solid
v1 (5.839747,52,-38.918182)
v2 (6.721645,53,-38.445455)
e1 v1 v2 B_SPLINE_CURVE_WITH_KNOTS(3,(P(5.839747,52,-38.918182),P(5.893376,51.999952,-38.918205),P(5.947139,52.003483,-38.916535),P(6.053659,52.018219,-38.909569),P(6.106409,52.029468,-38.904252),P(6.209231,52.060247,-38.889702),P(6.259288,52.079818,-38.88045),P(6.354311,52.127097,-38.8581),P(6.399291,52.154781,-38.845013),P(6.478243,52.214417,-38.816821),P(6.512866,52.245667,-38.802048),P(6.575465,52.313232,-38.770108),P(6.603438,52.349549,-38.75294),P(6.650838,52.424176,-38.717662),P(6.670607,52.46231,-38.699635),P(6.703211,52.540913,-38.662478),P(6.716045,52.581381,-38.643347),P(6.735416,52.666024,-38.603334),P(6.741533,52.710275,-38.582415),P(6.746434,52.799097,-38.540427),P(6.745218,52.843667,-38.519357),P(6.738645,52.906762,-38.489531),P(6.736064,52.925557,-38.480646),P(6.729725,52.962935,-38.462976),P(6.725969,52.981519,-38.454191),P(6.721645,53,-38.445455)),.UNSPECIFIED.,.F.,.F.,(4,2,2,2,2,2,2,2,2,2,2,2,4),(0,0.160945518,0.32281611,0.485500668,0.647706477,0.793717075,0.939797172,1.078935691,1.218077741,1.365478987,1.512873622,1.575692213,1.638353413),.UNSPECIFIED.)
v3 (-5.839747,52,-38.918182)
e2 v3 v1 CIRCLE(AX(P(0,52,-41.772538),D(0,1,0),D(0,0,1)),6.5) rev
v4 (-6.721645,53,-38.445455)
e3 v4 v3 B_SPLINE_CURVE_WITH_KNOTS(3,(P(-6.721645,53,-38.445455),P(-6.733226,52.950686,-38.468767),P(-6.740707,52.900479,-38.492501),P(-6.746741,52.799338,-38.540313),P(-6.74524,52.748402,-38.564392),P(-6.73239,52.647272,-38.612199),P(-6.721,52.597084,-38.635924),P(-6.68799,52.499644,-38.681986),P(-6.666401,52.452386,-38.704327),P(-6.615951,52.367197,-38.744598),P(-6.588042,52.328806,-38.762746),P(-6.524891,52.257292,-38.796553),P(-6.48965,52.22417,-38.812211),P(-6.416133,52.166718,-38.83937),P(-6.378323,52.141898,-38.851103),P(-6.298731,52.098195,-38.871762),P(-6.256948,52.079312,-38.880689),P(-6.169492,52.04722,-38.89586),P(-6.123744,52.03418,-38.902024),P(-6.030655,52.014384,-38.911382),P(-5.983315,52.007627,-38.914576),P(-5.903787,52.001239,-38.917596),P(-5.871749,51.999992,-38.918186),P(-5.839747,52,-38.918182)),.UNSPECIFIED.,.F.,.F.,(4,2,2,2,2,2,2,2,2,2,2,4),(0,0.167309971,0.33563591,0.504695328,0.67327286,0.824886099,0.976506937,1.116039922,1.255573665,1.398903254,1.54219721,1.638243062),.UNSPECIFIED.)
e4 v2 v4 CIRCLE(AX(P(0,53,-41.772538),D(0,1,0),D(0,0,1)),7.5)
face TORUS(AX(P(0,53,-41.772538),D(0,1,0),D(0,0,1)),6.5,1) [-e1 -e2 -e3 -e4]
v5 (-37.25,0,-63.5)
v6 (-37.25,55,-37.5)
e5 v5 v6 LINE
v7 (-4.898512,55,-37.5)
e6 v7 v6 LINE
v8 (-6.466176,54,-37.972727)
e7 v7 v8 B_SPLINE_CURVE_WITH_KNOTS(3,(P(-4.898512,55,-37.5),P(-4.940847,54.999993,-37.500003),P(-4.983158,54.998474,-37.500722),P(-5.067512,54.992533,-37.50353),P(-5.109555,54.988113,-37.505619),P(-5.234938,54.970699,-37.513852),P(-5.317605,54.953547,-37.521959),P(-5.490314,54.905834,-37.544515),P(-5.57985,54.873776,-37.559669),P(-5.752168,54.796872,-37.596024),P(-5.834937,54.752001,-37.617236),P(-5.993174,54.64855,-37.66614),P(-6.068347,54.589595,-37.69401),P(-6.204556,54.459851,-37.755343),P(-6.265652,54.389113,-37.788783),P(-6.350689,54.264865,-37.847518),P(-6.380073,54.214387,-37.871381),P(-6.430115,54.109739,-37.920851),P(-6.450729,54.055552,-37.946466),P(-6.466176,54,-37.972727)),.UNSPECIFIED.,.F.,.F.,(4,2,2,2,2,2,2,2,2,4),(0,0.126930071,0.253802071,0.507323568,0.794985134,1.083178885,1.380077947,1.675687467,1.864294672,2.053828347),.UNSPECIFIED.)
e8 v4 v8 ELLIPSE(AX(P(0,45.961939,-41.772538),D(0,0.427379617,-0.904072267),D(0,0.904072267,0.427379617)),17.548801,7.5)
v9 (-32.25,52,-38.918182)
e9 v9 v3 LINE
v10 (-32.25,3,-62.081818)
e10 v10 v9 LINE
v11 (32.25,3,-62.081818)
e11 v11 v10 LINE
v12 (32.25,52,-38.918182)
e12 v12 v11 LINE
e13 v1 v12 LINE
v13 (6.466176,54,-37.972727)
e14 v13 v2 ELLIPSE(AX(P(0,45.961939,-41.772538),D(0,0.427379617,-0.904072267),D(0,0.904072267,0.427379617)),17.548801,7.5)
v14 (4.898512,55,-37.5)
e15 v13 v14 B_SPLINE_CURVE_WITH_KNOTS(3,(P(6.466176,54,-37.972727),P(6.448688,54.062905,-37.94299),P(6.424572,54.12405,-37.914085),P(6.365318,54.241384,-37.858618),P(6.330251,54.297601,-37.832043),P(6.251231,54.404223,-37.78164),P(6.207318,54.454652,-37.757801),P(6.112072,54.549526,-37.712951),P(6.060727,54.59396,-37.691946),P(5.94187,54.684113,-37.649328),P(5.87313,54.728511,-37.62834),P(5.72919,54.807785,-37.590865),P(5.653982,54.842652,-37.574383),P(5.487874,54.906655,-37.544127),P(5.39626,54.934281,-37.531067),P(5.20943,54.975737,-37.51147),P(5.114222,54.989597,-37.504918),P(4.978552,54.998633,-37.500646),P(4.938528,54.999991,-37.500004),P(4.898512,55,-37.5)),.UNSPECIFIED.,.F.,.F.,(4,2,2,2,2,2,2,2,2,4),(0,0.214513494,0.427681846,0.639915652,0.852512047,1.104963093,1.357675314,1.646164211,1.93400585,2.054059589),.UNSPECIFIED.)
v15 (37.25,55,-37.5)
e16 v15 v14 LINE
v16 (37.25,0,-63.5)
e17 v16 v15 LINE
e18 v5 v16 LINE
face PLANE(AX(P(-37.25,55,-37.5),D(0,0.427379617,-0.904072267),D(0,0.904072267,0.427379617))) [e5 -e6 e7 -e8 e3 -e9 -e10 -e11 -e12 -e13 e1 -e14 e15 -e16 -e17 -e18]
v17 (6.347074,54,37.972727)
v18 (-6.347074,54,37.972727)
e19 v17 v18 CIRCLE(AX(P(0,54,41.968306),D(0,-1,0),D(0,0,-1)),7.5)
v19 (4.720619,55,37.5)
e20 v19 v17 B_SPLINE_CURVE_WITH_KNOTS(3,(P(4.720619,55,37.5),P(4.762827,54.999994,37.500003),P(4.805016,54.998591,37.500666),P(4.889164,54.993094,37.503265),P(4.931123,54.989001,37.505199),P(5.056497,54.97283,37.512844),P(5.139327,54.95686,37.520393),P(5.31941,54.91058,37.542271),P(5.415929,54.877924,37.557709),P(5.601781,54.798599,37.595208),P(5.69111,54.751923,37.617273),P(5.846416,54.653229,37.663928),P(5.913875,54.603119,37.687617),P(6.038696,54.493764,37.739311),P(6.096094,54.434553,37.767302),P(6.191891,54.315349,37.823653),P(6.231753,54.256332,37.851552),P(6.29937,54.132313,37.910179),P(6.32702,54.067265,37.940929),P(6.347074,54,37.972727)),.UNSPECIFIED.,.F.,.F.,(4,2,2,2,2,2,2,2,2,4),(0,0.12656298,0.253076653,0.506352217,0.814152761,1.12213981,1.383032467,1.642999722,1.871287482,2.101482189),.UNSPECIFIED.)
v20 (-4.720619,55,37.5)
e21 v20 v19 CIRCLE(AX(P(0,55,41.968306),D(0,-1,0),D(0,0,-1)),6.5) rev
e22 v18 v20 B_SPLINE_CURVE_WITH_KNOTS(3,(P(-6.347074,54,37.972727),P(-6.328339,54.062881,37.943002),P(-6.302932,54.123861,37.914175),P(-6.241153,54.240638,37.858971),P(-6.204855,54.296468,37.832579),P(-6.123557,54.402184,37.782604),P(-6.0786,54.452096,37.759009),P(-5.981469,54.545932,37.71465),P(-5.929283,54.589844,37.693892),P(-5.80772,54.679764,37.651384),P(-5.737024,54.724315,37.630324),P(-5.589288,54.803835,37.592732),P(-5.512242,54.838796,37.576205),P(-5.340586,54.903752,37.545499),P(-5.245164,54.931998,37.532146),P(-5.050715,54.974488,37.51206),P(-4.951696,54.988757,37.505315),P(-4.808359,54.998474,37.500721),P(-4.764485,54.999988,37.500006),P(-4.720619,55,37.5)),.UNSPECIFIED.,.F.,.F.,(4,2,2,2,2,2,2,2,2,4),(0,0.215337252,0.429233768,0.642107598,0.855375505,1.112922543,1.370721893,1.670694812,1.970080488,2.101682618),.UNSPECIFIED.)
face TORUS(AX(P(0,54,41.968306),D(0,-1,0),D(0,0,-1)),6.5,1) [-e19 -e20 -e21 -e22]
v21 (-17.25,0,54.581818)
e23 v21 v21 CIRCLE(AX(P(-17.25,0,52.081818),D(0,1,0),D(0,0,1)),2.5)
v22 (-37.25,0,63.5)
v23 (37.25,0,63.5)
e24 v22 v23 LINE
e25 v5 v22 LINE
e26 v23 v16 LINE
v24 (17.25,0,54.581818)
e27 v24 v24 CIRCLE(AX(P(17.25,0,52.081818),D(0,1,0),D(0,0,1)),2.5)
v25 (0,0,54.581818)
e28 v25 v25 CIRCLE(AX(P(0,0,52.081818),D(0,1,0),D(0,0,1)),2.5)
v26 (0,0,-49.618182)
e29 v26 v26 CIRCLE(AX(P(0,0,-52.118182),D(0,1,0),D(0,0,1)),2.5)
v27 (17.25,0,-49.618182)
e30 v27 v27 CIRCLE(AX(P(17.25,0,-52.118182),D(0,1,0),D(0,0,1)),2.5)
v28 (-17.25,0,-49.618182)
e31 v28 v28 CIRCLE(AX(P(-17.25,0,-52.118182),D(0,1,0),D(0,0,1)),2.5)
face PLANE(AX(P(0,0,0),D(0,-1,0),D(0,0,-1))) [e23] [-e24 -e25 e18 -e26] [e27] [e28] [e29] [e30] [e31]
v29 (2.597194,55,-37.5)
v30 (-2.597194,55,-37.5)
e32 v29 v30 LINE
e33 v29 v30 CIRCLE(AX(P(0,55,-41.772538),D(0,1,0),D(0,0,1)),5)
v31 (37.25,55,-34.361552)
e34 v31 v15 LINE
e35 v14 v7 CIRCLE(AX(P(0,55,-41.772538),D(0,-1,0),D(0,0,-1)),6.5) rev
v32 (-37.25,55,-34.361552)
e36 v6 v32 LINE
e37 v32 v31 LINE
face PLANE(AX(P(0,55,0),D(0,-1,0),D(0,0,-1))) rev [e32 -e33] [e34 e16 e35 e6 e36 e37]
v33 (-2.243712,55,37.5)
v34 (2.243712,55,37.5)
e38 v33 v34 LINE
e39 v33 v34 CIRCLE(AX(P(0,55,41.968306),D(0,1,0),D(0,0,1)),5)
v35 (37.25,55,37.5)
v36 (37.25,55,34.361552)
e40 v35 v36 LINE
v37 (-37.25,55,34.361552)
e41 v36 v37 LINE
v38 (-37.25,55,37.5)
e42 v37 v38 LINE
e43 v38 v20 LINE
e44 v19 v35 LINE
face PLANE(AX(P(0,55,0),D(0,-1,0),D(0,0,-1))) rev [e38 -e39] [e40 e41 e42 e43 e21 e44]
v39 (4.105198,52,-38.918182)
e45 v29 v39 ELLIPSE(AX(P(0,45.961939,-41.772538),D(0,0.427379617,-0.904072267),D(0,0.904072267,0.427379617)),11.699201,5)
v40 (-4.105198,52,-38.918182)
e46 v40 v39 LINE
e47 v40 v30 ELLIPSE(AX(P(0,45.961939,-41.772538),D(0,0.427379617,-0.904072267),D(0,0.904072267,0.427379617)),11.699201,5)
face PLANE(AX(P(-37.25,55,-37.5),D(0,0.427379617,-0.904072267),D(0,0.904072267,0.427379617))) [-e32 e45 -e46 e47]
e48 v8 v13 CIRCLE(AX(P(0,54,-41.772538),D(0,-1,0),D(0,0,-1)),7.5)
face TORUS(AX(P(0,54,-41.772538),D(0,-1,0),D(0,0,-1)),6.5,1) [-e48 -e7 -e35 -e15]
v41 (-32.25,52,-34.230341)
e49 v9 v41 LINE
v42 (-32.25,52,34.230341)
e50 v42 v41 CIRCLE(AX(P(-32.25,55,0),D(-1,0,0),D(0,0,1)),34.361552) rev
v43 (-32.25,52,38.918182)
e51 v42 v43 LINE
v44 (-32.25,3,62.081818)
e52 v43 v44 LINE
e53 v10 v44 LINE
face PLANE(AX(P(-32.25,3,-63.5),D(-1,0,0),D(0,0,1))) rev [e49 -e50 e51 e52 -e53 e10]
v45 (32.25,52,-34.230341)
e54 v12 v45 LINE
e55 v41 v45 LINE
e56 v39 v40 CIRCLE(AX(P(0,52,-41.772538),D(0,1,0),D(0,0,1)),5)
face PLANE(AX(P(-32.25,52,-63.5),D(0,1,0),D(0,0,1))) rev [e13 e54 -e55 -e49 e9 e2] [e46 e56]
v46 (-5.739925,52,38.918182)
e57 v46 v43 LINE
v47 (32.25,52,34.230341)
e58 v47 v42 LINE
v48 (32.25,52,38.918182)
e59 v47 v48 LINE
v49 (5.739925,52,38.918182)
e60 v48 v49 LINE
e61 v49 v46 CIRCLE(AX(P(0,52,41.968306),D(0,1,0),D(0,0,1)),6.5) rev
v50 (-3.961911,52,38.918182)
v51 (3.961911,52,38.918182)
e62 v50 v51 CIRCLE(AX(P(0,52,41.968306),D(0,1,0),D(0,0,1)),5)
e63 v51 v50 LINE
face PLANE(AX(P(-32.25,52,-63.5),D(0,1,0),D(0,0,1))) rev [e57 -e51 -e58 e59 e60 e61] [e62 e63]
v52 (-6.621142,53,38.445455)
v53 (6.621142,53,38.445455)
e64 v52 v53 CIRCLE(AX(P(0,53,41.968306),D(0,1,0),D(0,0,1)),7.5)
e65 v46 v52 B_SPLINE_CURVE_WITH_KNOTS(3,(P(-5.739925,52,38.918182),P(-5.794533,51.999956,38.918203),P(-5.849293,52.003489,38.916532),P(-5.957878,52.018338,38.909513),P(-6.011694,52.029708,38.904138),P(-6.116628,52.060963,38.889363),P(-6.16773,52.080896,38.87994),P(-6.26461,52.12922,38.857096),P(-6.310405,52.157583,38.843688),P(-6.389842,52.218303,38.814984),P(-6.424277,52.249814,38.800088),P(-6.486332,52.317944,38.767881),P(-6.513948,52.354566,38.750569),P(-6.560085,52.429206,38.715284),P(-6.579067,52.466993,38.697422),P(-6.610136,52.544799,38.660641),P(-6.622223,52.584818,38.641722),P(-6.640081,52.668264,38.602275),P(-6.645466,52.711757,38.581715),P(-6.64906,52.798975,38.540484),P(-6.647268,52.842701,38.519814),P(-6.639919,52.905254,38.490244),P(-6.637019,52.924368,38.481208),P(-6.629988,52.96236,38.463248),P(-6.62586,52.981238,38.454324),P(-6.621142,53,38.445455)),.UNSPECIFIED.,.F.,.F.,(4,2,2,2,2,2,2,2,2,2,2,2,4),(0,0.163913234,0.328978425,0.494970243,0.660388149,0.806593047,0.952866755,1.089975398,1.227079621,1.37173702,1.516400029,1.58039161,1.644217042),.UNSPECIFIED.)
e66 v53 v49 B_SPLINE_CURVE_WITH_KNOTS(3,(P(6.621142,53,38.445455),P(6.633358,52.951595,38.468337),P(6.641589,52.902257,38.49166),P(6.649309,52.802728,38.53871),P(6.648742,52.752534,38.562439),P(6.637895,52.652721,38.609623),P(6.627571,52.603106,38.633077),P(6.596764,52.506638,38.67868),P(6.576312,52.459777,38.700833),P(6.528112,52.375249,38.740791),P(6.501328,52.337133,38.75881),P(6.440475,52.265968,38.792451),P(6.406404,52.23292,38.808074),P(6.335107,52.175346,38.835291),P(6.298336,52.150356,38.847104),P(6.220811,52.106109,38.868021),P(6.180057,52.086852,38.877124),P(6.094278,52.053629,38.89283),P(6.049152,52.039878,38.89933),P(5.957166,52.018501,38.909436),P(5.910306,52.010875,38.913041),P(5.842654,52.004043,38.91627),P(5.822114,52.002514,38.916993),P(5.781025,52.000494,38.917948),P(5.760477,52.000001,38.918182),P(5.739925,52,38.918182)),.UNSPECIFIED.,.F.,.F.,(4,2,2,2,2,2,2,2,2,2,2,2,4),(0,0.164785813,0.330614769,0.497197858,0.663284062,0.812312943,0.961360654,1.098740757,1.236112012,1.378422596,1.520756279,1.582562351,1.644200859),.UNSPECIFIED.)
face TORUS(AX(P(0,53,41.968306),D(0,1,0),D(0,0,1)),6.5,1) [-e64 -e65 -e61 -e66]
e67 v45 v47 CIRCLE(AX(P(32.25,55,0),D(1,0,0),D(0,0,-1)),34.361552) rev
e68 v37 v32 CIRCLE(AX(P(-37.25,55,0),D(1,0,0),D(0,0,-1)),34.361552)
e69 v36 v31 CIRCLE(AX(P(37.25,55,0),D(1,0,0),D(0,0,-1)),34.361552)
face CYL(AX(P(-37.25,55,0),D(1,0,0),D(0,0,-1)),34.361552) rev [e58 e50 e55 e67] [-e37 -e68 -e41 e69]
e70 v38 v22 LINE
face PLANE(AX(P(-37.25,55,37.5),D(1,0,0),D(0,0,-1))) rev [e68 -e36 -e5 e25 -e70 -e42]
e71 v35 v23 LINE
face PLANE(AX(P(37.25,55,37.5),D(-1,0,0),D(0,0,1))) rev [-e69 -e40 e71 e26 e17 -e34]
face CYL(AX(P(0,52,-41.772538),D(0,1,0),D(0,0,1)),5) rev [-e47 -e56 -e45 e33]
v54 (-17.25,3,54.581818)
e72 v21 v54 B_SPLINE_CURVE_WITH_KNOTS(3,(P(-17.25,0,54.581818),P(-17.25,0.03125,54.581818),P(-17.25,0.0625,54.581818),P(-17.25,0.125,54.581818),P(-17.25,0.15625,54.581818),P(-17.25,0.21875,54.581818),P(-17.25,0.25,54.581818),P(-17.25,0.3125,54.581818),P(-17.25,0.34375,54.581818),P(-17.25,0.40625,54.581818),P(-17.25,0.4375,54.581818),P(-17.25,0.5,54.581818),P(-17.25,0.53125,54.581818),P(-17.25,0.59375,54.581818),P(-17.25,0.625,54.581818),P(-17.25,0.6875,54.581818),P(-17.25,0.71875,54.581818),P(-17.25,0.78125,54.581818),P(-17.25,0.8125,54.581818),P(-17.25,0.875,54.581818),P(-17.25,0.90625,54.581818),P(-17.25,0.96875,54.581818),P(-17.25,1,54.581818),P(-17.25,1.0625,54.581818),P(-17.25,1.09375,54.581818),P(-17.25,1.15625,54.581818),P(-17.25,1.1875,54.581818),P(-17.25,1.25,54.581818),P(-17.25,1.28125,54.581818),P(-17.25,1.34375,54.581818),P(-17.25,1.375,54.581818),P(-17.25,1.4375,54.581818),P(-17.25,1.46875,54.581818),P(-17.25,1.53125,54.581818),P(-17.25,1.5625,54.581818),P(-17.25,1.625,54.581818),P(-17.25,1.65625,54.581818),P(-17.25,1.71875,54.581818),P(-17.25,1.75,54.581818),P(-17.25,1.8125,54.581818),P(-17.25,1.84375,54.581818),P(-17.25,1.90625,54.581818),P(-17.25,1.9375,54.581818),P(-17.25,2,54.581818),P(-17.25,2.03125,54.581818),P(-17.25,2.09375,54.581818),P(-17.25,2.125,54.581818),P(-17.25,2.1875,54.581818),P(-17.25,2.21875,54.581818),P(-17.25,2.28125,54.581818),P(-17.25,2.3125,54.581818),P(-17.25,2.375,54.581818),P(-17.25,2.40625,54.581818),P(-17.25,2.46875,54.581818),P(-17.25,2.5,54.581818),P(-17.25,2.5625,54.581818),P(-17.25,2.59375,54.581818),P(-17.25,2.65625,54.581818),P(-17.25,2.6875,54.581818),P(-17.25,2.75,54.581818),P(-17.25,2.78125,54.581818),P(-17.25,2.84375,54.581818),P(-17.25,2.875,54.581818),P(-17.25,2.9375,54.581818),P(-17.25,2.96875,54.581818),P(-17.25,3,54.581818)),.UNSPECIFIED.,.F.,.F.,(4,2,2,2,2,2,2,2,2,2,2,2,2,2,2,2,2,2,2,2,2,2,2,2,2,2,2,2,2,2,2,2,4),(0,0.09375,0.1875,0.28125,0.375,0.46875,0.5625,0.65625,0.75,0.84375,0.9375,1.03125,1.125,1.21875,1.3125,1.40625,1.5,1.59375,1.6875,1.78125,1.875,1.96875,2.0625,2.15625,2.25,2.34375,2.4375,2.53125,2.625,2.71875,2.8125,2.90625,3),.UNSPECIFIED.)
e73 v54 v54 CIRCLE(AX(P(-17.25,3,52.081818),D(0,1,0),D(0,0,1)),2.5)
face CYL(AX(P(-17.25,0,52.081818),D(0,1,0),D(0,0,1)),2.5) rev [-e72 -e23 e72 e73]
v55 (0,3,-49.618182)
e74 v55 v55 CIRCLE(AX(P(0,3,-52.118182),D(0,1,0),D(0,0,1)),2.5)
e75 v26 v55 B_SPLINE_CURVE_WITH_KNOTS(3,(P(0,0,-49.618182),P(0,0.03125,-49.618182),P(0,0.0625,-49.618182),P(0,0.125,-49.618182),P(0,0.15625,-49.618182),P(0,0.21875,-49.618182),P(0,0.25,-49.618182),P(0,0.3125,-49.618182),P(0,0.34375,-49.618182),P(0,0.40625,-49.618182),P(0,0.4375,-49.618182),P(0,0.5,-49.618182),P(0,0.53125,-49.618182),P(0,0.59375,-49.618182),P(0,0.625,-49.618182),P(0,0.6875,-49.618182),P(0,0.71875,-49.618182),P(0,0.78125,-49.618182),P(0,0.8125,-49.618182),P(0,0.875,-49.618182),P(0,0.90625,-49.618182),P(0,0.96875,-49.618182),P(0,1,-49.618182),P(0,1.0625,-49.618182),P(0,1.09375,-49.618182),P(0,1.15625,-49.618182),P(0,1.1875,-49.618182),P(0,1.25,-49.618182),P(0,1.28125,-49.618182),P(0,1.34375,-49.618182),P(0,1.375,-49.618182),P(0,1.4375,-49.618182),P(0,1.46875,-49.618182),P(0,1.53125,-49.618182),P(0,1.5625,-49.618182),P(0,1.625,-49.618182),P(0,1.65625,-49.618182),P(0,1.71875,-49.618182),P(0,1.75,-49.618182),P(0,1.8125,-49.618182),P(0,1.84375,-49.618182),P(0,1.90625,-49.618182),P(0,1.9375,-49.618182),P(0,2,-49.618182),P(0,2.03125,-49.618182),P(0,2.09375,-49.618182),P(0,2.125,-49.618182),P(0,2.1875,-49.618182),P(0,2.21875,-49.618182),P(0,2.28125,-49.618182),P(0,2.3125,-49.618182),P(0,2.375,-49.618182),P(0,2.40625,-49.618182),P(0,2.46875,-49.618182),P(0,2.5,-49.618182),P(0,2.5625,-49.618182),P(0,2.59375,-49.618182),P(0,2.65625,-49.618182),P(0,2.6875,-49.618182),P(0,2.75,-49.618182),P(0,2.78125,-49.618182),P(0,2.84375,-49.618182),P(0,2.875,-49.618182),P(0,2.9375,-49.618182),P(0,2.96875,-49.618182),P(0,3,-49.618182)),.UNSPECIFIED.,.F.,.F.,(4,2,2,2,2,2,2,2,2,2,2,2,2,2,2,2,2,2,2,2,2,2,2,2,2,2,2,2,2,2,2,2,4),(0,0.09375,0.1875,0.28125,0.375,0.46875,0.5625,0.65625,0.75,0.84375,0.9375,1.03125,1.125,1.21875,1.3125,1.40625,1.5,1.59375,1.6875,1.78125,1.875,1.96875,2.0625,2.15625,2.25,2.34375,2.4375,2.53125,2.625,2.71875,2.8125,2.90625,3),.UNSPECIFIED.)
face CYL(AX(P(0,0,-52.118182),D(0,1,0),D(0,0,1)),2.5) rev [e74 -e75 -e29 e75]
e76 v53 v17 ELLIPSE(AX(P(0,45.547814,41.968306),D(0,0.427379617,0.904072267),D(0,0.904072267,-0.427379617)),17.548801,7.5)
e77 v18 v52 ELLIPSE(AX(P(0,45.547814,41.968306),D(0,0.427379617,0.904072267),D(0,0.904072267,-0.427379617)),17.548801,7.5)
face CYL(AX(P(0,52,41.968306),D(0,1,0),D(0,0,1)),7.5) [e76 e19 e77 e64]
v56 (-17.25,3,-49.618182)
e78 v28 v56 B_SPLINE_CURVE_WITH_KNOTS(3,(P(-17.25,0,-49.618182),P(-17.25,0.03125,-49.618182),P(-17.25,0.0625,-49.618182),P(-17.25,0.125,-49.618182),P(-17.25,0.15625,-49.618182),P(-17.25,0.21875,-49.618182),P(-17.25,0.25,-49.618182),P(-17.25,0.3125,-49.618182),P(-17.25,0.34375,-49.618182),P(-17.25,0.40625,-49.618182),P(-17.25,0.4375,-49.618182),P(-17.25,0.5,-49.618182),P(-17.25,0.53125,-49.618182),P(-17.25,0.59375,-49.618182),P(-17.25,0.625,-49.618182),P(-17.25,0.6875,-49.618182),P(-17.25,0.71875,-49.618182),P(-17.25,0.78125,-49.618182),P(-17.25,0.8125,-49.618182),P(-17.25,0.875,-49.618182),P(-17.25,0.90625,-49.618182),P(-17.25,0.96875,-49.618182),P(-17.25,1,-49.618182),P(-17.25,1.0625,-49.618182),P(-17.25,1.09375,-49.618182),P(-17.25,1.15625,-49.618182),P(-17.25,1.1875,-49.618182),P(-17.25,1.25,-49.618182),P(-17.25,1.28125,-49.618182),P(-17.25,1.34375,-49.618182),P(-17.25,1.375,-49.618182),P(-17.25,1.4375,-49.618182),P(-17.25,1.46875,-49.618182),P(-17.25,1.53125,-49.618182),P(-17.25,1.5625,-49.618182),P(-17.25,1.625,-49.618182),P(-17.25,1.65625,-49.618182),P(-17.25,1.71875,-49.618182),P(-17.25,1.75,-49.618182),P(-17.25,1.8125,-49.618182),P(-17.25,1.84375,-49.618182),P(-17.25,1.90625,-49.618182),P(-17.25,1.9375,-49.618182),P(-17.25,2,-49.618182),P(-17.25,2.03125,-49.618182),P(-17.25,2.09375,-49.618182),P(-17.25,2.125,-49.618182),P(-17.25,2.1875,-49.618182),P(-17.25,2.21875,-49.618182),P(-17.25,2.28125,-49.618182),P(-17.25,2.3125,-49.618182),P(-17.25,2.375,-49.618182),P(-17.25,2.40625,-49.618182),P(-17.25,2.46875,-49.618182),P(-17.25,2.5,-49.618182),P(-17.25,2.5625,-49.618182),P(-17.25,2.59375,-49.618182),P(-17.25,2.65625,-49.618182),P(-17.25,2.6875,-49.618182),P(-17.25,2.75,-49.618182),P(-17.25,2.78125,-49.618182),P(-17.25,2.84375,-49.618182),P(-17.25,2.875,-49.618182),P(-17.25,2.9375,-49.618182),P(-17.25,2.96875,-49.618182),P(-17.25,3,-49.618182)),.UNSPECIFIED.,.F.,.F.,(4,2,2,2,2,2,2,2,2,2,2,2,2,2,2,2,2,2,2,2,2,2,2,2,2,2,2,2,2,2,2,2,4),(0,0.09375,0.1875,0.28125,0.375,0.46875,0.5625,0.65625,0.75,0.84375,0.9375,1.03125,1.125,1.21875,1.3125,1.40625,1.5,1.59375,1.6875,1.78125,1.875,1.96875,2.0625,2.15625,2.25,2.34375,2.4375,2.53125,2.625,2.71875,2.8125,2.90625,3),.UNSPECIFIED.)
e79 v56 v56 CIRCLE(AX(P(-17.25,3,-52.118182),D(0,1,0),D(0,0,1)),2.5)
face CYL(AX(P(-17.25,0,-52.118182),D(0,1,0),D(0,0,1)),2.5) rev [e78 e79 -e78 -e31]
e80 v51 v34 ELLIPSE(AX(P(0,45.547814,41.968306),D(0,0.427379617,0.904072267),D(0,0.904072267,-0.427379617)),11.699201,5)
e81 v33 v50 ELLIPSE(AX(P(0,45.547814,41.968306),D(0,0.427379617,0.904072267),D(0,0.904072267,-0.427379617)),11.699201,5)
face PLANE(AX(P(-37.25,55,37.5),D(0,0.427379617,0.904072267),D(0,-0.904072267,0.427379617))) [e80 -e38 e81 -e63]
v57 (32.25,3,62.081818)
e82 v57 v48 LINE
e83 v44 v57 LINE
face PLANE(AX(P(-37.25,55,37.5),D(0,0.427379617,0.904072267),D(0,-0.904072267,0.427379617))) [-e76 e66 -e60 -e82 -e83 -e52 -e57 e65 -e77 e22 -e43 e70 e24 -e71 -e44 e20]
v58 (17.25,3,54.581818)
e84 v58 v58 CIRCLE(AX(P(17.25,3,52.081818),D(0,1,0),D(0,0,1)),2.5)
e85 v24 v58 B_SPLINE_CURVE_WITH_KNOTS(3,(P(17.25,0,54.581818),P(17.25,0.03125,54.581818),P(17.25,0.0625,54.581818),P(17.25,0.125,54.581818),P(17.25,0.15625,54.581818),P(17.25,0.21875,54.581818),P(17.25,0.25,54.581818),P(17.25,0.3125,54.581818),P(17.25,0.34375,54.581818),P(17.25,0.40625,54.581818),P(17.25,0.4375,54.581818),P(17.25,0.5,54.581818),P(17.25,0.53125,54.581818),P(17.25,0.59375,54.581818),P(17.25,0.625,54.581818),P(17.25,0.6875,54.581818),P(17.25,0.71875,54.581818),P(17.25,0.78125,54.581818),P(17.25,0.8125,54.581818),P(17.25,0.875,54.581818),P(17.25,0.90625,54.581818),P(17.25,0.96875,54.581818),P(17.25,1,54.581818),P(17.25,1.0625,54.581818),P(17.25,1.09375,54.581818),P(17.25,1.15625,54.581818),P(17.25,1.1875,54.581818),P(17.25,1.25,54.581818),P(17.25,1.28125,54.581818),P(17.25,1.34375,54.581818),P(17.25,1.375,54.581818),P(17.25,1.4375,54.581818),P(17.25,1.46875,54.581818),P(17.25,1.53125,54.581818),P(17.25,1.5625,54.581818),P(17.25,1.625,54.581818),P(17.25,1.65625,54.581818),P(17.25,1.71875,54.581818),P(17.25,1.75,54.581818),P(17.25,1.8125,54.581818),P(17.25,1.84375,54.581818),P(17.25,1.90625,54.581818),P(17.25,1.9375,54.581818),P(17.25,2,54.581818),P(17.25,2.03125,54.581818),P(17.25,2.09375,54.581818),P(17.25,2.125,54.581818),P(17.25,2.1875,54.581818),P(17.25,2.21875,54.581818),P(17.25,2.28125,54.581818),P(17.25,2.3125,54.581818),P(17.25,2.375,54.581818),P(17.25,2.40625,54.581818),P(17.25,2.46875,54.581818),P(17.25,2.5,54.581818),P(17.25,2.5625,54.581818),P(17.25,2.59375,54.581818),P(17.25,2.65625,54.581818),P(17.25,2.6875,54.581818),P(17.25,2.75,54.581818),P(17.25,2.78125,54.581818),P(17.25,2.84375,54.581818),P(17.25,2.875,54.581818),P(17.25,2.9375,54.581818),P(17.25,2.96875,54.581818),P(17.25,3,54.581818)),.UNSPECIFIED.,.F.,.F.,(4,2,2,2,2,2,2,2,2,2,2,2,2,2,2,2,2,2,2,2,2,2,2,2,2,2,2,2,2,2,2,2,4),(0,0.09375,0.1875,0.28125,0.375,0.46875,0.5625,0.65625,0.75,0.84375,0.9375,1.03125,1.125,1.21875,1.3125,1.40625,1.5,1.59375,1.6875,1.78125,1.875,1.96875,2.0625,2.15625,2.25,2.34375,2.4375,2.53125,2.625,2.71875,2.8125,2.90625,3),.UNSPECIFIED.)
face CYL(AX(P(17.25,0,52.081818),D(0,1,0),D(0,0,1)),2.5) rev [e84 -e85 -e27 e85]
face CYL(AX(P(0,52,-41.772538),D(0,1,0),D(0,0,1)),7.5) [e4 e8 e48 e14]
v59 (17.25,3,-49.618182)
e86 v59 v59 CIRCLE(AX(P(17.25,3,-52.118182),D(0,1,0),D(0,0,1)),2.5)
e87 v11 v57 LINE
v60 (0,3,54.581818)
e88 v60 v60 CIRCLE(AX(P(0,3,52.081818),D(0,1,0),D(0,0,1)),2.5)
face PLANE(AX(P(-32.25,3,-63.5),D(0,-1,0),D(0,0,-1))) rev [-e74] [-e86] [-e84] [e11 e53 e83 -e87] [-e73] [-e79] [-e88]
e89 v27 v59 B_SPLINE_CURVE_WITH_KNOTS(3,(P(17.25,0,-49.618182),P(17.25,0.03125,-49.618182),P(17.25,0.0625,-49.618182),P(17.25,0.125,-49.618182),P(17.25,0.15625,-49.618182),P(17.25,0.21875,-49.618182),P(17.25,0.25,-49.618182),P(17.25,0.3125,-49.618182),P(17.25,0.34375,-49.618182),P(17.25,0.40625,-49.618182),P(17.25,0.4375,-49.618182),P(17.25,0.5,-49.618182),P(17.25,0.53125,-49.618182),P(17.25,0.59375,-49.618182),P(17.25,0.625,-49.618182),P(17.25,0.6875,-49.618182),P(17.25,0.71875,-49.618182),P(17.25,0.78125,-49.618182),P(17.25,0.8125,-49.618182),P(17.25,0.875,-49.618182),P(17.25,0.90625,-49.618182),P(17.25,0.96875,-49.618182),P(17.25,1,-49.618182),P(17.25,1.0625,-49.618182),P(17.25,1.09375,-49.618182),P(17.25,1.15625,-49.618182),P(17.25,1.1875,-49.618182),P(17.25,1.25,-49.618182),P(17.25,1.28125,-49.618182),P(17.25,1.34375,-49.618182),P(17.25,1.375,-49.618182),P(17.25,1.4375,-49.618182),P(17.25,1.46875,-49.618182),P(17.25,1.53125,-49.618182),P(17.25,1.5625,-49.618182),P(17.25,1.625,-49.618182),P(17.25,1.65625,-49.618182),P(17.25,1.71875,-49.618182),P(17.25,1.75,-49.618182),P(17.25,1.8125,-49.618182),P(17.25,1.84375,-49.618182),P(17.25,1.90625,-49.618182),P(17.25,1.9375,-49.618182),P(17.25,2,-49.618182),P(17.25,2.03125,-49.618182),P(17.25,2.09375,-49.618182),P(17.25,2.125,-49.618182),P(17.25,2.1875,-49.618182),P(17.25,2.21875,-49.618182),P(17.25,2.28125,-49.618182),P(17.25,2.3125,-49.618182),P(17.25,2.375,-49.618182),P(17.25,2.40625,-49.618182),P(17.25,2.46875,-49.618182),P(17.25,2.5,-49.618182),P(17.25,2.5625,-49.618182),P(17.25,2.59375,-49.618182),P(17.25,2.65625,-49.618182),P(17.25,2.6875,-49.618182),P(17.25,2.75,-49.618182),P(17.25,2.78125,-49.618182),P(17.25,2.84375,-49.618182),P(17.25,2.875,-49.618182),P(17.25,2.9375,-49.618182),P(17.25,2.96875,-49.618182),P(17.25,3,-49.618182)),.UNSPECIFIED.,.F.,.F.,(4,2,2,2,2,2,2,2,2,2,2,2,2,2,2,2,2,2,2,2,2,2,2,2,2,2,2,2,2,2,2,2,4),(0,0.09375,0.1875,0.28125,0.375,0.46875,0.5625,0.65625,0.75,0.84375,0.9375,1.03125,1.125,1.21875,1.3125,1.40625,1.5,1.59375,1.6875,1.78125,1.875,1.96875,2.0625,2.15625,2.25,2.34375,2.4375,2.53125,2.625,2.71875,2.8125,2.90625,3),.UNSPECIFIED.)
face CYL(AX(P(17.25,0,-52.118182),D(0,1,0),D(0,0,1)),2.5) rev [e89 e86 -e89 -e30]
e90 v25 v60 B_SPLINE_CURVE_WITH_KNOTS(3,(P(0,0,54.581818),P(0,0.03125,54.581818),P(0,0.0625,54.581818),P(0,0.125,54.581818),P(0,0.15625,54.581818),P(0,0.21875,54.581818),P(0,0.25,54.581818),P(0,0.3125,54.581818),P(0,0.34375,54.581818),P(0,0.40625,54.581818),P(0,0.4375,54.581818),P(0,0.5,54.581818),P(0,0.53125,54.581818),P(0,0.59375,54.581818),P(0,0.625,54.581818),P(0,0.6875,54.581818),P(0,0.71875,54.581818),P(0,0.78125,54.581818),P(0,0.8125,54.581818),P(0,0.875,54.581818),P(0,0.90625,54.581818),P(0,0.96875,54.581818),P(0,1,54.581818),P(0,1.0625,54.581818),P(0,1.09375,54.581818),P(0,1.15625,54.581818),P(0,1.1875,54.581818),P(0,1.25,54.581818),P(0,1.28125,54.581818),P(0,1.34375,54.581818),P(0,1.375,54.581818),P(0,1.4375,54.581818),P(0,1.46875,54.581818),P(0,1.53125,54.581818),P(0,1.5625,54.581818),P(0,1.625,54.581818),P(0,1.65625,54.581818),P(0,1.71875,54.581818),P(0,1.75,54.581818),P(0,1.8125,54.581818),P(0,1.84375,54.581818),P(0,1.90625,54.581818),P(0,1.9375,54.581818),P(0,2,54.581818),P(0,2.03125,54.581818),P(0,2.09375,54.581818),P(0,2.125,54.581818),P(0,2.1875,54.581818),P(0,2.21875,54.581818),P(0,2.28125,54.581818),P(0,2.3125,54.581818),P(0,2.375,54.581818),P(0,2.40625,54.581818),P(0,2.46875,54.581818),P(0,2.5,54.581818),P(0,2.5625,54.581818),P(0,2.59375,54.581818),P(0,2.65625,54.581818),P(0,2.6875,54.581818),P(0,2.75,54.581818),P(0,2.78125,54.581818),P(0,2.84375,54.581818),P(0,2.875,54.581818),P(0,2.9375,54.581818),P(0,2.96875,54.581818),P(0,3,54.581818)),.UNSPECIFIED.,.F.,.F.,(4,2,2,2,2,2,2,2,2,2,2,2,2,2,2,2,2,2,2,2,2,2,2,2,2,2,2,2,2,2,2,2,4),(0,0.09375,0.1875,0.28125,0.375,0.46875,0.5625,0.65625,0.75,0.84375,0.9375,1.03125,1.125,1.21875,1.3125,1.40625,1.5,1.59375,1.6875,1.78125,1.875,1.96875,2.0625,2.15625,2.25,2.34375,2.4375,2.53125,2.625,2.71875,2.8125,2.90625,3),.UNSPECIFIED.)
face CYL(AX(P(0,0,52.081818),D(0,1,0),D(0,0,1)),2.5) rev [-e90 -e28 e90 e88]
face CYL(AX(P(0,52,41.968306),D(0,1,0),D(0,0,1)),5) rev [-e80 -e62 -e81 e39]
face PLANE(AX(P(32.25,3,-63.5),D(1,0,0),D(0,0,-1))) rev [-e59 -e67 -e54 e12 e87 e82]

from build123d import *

# Parameters (mm, degrees)
SKETCH1_W               = 74.5
SKETCH1_H               = 75
BOSS_EXTRUDE1_DEPTH     = 55
SKETCH5_R               = 34.3615522135402
CUT_EXTRUDE2_DEPTH      = 100.90745717913153
BOSS_EXTRUDE3_DEPTH     = 74.5
BOSS_EXTRUDE4_DEPTH     = 74.5
CUT_EXTRUDE3_DEPTH      = 121.88656873284145
CUT_EXTRUDE3_DEPTH_BACK = 121.88656873284145
SKETCH9_W               = 64.5
SKETCH9_H               = 49.00000000000001
BOSS_EXTRUDE5_DEPTH     = 3
BOSS_EXTRUDE6_DEPTH     = 3
FILLET1_R               = 1
SKETCH12_R              = 2.499999999999999
SKETCH12_R_2            = 2.5000000000000027
SKETCH12_R_3            = 2.5000000000000018
CUT_EXTRUDE4_DEPTH      = 91.13219475054404
LPATTERN1_COUNT         = 2
LPATTERN1_PITCH         = 104.2


with BuildPart() as part:
    # Sketch1 → Boss-Extrude1 (new body)
    with BuildSketch(Plane(origin=(0, 0, 0), x_dir=(1, 0, 0), z_dir=(0, 1, 0))):
        Rectangle(SKETCH1_W, SKETCH1_H)
    extrude(amount=BOSS_EXTRUDE1_DEPTH)

    # Sketch5 → Cut-Extrude2 (cut, through all)
    with BuildSketch(Plane(origin=(37.25, 0, 0), x_dir=(0, 0, -1), z_dir=(1, 0, 0))):
        with Locations((6.94e-15, 55)):
            Circle(SKETCH5_R)
    extrude(amount=-CUT_EXTRUDE2_DEPTH, mode=Mode.SUBTRACT)

    # Sketch7 → Boss-Extrude3 (add)
    with BuildSketch(Plane(origin=(37.25, 0, 0), x_dir=(0, 0, -1), z_dir=(1, 0, 0))):
        Polygon((-37.49999999999999, 55), (-63.5, 0), (-37.49999999999999, 0), align=None)
    extrude(amount=-BOSS_EXTRUDE3_DEPTH)

    # Sketch8 → Boss-Extrude4 (add)
    with BuildSketch(Plane(origin=(37.25, 0, 0), x_dir=(0, 0, -1), z_dir=(1, 0, 0))):
        Polygon((37.50000000000001, 55), (63.5, -2.4e-16), (37.50000000000001, 0), align=None)
    extrude(amount=-BOSS_EXTRUDE4_DEPTH)

    # Sketch9 → Cut-Extrude3 (cut, two sides: drawn at the far end of the back side and taken through both)
    with BuildSketch(Plane.XY.offset(37.49999999999999).offset(-CUT_EXTRUDE3_DEPTH_BACK)):
        with Locations((0, 27.500000000000004)):
            Rectangle(SKETCH9_W, SKETCH9_H)
    extrude(amount=CUT_EXTRUDE3_DEPTH + CUT_EXTRUDE3_DEPTH_BACK, mode=Mode.SUBTRACT)

    # Sketch10 → Boss-Extrude5 (add)
    with BuildSketch(Plane(origin=(0, 55, 0), x_dir=(1, 0, 0), z_dir=(0, 1, 0))):
        with BuildLine():
            ThreePointArc((6.164042343036378, 37.499999999999844), (7.158223158465123, 39.534270662732936), (7.5, 41.77253812074898))
            ThreePointArc((7.5, 41.77253812074898), (-2.2382674580157964, 48.93076127921418), (-6.164042343036669, 37.50000000000026))
            Line((-6.164042343036755, 37.50000000000001), (-2.5971942566442934, 37.50000000000001))
            ThreePointArc((-2.5971942566443156, 37.499999999999936), (-2.4509211244732474, 46.1306323879271), (4.999999999999999, 41.77253812074898))
            ThreePointArc((4.999999999999999, 41.77253812074898), (4.358094267178168, 39.32161699627582), (2.5971942566444843, 37.50000000000004))
            Line((2.5971942566444923, 37.50000000000001), (6.164042343036321, 37.50000000000001))
        make_face()
    extrude(amount=-BOSS_EXTRUDE5_DEPTH)

    # Sketch11 → Boss-Extrude6 (add)
    with BuildSketch(Plane(origin=(0, 55, 0), x_dir=(1, 0, 0), z_dir=(0, 1, 0))):
        with BuildLine():
            ThreePointArc((-6.023640204727232, -37.49999999999989), (-2.3529448000904902, -49.08965777094965), (7.5, -41.96830601951038))
            ThreePointArc((7.5, -41.96830601951038), (7.121351751439286, -39.615361219419945), (6.023640204727302, -37.499999999999986))
            Line((6.0236402047273, -37.49999999999999), (2.2437115046296583, -37.49999999999999))
            ThreePointArc((2.243711504629653, -37.500000000000014), (4.255499825117389, -39.34328768844565), (4.999999999999999, -41.96830601951038))
            ThreePointArc((4.999999999999999, -41.96830601951038), (-2.6250183310647546, -46.223805844627755), (-2.2437115046296032, -37.49999999999999))
            Line((-2.2437115046296014, -37.49999999999999), (-6.023640204727201, -37.49999999999999))
        make_face()
        with BuildLine():
            Line((2.2437115046296583, -37.49999999999999), (6.0236402047273, -37.49999999999999))
            ThreePointArc((6.023640204727302, -37.499999999999986), (5.875e-14, -34.46830601951038), (-6.023640204727232, -37.49999999999989))
            Line((-6.023640204727201, -37.49999999999999), (-2.2437115046296014, -37.49999999999999))
            ThreePointArc((-2.2437115046296032, -37.49999999999999), (2.806e-14, -36.96830601951038), (2.243711504629653, -37.500000000000014))
        make_face()
    extrude(amount=-BOSS_EXTRUDE6_DEPTH)

    # Fillet1
    # the kernel refuses this fillet: 1 mm, written as the material it takes off along each edge
    with BuildSketch(Plane(origin=(-3.55e-15, 55, 41.96830601951038), x_dir=(1, 0, 0), z_dir=(0, 0, -1))) as fillet1_piece_1_section:
        with BuildLine():
            CenterArc((7.5 - FILLET1_R, FILLET1_R), FILLET1_R, 270, 90)
            Line((7.5, FILLET1_R), (7.5, 0))
            Line((7.5, 0), (7.5 - FILLET1_R, 0))
        make_face()
    fillet1_piece_1 = revolve(axis=Axis((-3.55e-15, 55, 41.96830601951038), (0, -1, 0)), revolution_arc=235.71091499042655, mode=Mode.PRIVATE)
    fillet1_piece_1 = split(fillet1_piece_1, bisect_by=Plane(origin=(-2.6713999236626833, 50.45322927533666, 39.6493825243863), z_dir=(0, 0.42737961689341636, 0.9040722665053036)), keep=Keep.TOP, mode=Mode.PRIVATE)
    add(fillet1_piece_1, mode=Mode.SUBTRACT)
    with BuildSketch(Plane(origin=(1.78e-15, 52, 41.96830601951038), x_dir=(-0.7297482724094352, 0, -0.6837159197469698), z_dir=(0.6837159197469698, 0, -0.7297482724094352))) as fillet1_piece_2_section:
        with BuildLine():
            CenterArc((7.500000000000202 - FILLET1_R, FILLET1_R), FILLET1_R, 270, 90)
            Line((7.500000000000198, FILLET1_R), (7.500000000000202, 0))
            Line((7.500000000000202, 0), (7.500000000000202 - FILLET1_R, 0))
        make_face()
    fillet1_piece_2 = revolve(axis=Axis((1.78e-15, 52, 41.96830601951038), (0, 1, 0)), revolution_arc=223.13470500677207, mode=Mode.PRIVATE)
    fillet1_piece_2 = split(fillet1_piece_2, bisect_by=Plane(origin=(-1.7477354157855842, 48.3431338081412, 40.64688219978779), z_dir=(0, 0.42737961689341636, 0.9040722665053036)), keep=Keep.TOP, mode=Mode.PRIVATE)
    add(fillet1_piece_2, mode=Mode.SUBTRACT)
    with BuildSketch(Plane(origin=(1.33e-15, 55, -41.772538120748976), x_dir=(-0.5894081060524027, 0, 0.8078354315822744), z_dir=(0.8078354315822744, 0, 0.5894081060524027))) as fillet1_piece_3_section:
        with BuildLine():
            CenterArc((7.500000000001482 - FILLET1_R, FILLET1_R), FILLET1_R, 270, 90)
            Line((7.500000000001481, FILLET1_R), (7.500000000001482, 0))
            Line((7.500000000001482, 0), (7.500000000001482 - FILLET1_R, 0))
        make_face()
    fillet1_piece_3 = revolve(axis=Axis((1.33e-15, 55, -41.772538120748976), (0, -1, 0)), revolution_arc=287.7699662913145, mode=Mode.PRIVATE)
    fillet1_piece_3 = split(fillet1_piece_3, bisect_by=Plane(origin=(0, 50.33119352274253, -39.70707215288535), z_dir=(0, 0.42737961689341614, -0.9040722665053037)), keep=Keep.TOP, mode=Mode.PRIVATE)
    add(fillet1_piece_3, mode=Mode.SUBTRACT)
    with BuildSketch(Plane(origin=(5.33e-15, 52, -41.77253812074899), x_dir=(0.7487686990913793, 0, 0.662831377697981), z_dir=(-0.662831377697981, 0, 0.7487686990913793))) as fillet1_piece_4_section:
        with BuildLine():
            CenterArc((7.499999999999997 - FILLET1_R, FILLET1_R), FILLET1_R, 269.9999999999997, 90.00000000000028)
            Line((7.499999999999997 - FILLET1_R, 0), (7.499999999999997, 0))
            Line((7.499999999999997, 0), (7.499999999999996, FILLET1_R))
        make_face()
    fillet1_piece_4 = revolve(axis=Axis((5.33e-15, 52, -41.77253812074899), (0, 1, 0)), revolution_arc=263.03233782444397, mode=Mode.PRIVATE)
    fillet1_piece_4 = split(fillet1_piece_4, bisect_by=Plane(origin=(7.11e-15, 48.33525291032238, -40.65060771512034), z_dir=(0, 0.42737961689341614, -0.9040722665053037)), keep=Keep.TOP, mode=Mode.PRIVATE)
    add(fillet1_piece_4, mode=Mode.SUBTRACT)
    with BuildSketch(Plane(origin=(1.78e-15, 52, 41.96830601951038), x_dir=(1, 0, 0), z_dir=(0, 0, 1))) as fillet1_piece_5_section:
        with BuildLine():
            CenterArc((7.499999999999997 - FILLET1_R, FILLET1_R), FILLET1_R, 270, 90)
            Line((7.499999999999998, FILLET1_R), (7.499999999999997, 0))
            Line((7.499999999999997, 0), (7.499999999999997 - FILLET1_R, 0))
        make_face()
    fillet1_piece_5 = revolve(axis=Axis((1.78e-15, 52, 41.96830601951038), (0, 1, 0)), revolution_arc=43.0957883273494, mode=Mode.PRIVATE)
    fillet1_piece_5 = split(fillet1_piece_5, bisect_by=Plane(origin=(7.034955474041542, 51.63351194574045, 39.09143071655905), z_dir=(0, 0.42737961689341636, 0.9040722665053036)), keep=Keep.TOP, mode=Mode.PRIVATE)
    add(fillet1_piece_5, mode=Mode.SUBTRACT)
    with BuildSketch(Plane(origin=(-3.55e-15, 55, 41.96830601951038), x_dir=(0.563991699397745, 0, -0.825780456907551), z_dir=(-0.825780456907551, 0, -0.563991699397745))) as fillet1_piece_6_section:
        with BuildLine():
            CenterArc((7.499999999999998 - FILLET1_R, FILLET1_R), FILLET1_R, 270, 90)
            Line((7.499999999999998, FILLET1_R), (7.499999999999998, 0))
            Line((7.499999999999998, 0), (7.499999999999998 - FILLET1_R, 0))
        make_face()
    fillet1_piece_6 = revolve(axis=Axis((-3.55e-15, 55, 41.96830601951038), (0, -1, 0)), revolution_arc=55.66769762264099, mode=Mode.PRIVATE)
    fillet1_piece_6 = split(fillet1_piece_6, bisect_by=Plane(origin=(6.774695529731854, 53.96765158354673, 37.988019251414265), z_dir=(0, 0.42737961689341636, 0.9040722665053036)), keep=Keep.TOP, mode=Mode.PRIVATE)
    add(fillet1_piece_6, mode=Mode.SUBTRACT)

    # Sketch12 → Cut-Extrude4 (cut, through all)
    with BuildSketch(Plane(origin=(0, 3, 0), x_dir=(1, 0, 0), z_dir=(0, 1, 0))):
        with Locations(Location((-17.25, -52.08181818181816, 0), (0, 0, 270))):
            Circle(SKETCH12_R)
        with Locations(Location((17.25, -52.081818181818164, 0), (0, 0, 270))):
            Circle(SKETCH12_R_2)
        with Locations(Location((0, -52.081818181818164, 0), (0, 0, 270))):
            Circle(SKETCH12_R_3)
    cut_extrude4 = extrude(amount=-CUT_EXTRUDE4_DEPTH, mode=Mode.SUBTRACT)

    # LPattern1: Cut-Extrude4 ×2
    with Locations(*[(0, 0, -i * LPATTERN1_PITCH) for i in range(1, LPATTERN1_COUNT)]):
        add(cut_extrude4, mode=Mode.SUBTRACT)


solid = part.part
